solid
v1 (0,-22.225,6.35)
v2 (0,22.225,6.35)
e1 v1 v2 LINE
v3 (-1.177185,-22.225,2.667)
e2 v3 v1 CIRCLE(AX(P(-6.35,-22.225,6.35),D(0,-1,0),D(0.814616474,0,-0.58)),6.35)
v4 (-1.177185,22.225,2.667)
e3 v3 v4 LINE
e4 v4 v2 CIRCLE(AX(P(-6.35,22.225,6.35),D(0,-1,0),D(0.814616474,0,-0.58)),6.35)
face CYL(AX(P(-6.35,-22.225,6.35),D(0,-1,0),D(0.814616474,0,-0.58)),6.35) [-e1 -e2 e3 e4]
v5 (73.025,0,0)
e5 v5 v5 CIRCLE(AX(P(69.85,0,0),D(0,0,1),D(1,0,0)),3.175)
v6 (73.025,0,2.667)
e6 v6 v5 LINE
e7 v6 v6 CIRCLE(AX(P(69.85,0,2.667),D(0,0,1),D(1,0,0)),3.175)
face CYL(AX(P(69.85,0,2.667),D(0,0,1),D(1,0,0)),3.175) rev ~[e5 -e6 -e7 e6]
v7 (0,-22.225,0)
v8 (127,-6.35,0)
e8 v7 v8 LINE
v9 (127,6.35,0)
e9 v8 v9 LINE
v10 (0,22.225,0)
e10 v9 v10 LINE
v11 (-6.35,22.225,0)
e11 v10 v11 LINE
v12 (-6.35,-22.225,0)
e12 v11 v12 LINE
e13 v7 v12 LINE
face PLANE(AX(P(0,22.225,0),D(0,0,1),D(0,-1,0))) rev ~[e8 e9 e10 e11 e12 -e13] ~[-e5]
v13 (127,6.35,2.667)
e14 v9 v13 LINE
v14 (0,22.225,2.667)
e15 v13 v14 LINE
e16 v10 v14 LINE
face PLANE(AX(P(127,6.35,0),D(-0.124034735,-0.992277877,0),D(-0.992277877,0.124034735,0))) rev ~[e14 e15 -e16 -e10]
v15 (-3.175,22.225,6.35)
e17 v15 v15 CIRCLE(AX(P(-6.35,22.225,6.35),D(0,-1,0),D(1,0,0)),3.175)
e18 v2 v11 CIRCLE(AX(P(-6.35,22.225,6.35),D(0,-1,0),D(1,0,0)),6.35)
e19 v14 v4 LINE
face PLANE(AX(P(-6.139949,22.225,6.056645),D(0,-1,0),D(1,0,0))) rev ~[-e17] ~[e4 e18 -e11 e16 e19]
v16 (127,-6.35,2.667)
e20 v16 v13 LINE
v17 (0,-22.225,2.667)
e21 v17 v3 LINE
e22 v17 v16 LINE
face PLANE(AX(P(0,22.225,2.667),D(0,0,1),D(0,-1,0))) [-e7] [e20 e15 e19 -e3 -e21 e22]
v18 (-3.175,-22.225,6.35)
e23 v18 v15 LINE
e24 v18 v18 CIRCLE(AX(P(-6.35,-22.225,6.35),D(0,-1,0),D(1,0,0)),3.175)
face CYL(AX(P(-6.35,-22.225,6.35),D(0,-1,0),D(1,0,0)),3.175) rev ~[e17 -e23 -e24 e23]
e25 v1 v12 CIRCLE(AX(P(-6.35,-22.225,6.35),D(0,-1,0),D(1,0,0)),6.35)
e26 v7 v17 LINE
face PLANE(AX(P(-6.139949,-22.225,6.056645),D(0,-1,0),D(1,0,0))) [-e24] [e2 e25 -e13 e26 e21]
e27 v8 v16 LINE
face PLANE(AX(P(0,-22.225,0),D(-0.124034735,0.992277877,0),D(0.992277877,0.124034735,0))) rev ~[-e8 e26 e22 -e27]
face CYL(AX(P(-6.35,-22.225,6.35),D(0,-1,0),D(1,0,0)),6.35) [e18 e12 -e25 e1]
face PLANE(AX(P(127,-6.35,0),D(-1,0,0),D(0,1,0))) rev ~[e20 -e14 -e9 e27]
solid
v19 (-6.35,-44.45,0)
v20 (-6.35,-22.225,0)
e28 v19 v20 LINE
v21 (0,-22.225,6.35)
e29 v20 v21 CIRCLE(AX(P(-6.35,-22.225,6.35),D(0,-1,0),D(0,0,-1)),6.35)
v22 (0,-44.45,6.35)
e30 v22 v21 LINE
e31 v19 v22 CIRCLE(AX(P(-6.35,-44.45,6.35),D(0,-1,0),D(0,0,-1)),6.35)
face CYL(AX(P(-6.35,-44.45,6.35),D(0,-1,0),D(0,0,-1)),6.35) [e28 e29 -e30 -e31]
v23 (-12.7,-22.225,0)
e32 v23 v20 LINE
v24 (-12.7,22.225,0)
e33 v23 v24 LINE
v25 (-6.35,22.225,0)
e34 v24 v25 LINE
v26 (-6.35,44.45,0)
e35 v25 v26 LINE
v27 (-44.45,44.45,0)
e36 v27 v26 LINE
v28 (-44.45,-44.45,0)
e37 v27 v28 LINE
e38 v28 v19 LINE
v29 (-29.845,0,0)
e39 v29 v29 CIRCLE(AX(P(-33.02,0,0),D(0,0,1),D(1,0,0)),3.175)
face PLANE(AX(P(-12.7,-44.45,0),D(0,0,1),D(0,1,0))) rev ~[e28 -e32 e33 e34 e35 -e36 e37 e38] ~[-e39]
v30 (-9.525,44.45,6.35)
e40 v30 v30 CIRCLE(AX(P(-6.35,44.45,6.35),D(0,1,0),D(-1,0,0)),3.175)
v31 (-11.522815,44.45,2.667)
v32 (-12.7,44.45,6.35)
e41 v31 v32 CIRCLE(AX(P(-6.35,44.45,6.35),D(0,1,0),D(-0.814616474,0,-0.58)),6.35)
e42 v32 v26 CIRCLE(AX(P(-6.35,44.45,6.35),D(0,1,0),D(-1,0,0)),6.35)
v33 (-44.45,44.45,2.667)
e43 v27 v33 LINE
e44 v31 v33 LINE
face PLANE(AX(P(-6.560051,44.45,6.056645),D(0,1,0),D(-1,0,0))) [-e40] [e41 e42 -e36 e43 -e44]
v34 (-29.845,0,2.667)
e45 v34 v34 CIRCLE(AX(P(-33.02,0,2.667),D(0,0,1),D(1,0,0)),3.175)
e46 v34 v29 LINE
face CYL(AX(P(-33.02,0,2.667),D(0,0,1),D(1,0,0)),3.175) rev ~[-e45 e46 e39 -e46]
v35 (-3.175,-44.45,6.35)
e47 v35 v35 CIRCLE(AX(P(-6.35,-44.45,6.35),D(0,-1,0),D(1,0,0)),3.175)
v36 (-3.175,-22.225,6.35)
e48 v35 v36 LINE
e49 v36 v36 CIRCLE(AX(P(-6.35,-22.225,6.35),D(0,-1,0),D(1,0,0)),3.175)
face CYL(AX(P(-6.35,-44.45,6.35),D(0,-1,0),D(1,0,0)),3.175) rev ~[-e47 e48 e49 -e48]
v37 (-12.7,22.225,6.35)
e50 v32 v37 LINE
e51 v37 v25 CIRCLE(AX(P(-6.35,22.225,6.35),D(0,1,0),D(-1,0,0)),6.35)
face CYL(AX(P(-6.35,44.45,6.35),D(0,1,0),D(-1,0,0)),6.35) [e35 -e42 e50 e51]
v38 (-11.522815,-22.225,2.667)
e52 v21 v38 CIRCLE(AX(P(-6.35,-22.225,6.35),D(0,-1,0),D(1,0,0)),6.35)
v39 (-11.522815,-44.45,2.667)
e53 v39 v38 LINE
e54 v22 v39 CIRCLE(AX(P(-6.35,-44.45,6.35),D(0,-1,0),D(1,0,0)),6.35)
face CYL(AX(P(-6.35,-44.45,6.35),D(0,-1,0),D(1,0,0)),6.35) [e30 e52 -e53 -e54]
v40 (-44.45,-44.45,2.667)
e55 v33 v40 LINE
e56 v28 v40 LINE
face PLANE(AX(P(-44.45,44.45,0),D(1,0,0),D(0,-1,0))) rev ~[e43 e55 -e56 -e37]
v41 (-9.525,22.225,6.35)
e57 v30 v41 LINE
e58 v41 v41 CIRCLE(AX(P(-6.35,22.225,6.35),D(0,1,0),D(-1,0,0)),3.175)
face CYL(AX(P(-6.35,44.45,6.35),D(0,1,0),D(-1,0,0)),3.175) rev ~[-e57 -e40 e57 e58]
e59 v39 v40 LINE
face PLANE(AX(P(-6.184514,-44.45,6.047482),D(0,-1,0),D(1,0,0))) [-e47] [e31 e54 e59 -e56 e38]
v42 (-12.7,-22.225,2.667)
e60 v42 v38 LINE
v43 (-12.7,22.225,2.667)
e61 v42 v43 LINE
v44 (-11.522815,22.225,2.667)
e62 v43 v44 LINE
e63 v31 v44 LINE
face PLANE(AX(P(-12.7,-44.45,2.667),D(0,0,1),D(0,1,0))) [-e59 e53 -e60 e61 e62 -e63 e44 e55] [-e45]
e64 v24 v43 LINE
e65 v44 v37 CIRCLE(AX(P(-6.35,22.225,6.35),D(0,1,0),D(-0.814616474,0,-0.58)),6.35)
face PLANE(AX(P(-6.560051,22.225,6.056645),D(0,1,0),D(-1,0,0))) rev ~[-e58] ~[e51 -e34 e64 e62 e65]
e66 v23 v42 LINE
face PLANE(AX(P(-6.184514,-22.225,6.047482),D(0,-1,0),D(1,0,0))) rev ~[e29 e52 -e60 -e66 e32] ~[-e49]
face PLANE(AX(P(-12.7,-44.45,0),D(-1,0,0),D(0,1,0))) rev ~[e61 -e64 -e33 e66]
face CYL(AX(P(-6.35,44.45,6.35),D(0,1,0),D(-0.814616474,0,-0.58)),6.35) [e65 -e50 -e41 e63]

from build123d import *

# Parameters (mm, degrees)
F1_DEPTH  = 2.667
F2_DEPTH  = 6.35
F4_DEPTH  = 44.45
F5_R      = 3.175
F6_DEPTH  = 44.45
F8_DEPTH  = 2.667
F9_W      = 22.225
F9_H      = 2.667
F10_DEPTH = 6.35
F11_R     = 3.175
F12_DEPTH = 22.225
F13_R     = 3.175
F14_DEPTH = 22.225
F15_R     = 3.175
F16_DEPTH = 25.4
F17_R     = 3.175
F18_DEPTH = 25.4


with BuildPart() as f1:
    # F0 (on Top) → F1 (new body)
    with BuildSketch(Plane.XY):
        Polygon((127, 6.35), (0, 22.225), (0, -22.225), (127, -6.35), align=None)
    extrude(amount=F1_DEPTH)

    # F2 (add): a face of the model
    f2_faces = [f1.faces().sort_by_distance(p)[0] for p in [
        (0, 0, 1.3335),
    ]]
    extrude(f2_faces, amount=F2_DEPTH)

    # F3 (on face) → F4 (join, through all)
    with BuildSketch(Plane.XZ.offset(22.225)):
        with BuildLine():
            ThreePointArc((-1.177185389, 2.667), (-0.3014517122, 4.4167220557), (0, 6.35))
            ThreePointArc((0, 6.35), (-10.8401280605, 10.8401280605), (-6.35, 0))
            Line((-6.35, 0), (-6.35, 2.667))
            Line((-6.35, 2.667), (-1.177185389, 2.667))
        make_face()
    extrude(amount=-F4_DEPTH)

    # F5 (on face) → F6 (cut, through all)
    with BuildSketch(Plane.XZ.offset(22.225)):
        with Locations((-6.35, 6.35)):
            Circle(F5_R)
    extrude(amount=-F6_DEPTH, mode=Mode.SUBTRACT)

    # F17 (on face) → F18 (cut)
    with BuildSketch(Plane.XY.offset(2.667)):
        with Locations((69.85, 0)):
            Circle(F17_R)
    extrude(amount=-F18_DEPTH, mode=Mode.SUBTRACT)


with BuildPart() as f8:
    # F7 (on Top) → F8 (new body)
    with BuildSketch(Plane.XY):
        Polygon((-12.7, -44.45), (-12.7, -38.1), (-12.7, 38.1), (-12.7, 44.45), (-44.45, 44.45), (-44.45, -44.45), align=None)
    extrude(amount=F8_DEPTH)

    # F9 (on face) → F10 (join)
    with BuildSketch(Plane.YZ.offset(-12.7)):
        with Locations((-33.3375, 1.3335)):
            Rectangle(F9_W, F9_H)
        with Locations((33.3375, 1.3335)):
            Rectangle(F9_W, F9_H)
    extrude(amount=F10_DEPTH)

    # F11 (on face) → F12 (join, through all)
    with BuildSketch(Plane.XZ.offset(44.45)):
        with BuildLine():
            Line((-6.35, 2.667), (-6.35, 0))
            ThreePointArc((-6.35, 0), (-1.8598719395, 1.8598719395), (0, 6.35))
            ThreePointArc((0, 6.35), (-8.2832779443, 12.3985482878), (-11.522814611, 2.667))
            Line((-11.522814611, 2.667), (-6.35, 2.667))
        make_face()
        with Locations((-6.35, 6.35)):
            Circle(F11_R, mode=Mode.SUBTRACT)
    extrude(amount=-F12_DEPTH)

    # F13 (on face) → F14 (join, through all)
    with BuildSketch(Plane(origin=(0, 44.45, 0), x_dir=(-1, 0, 0), z_dir=(0, 1, 0))):
        with BuildLine():
            ThreePointArc((11.522814611, 2.667), (12.3985482878, 4.4167220557), (12.7, 6.35))
            ThreePointArc((12.7, 6.35), (1.8598719395, 10.8401280605), (6.35, 0))
            Line((6.35, 0), (6.35, 2.667))
            Line((6.35, 2.667), (11.522814611, 2.667))
        make_face()
        with Locations((6.35, 6.35)):
            Circle(F13_R, mode=Mode.SUBTRACT)
    extrude(amount=-F14_DEPTH)

    # F15 (on face) → F16 (cut)
    with BuildSketch(Plane.XY.offset(2.667)):
        with Locations((-33.02, 0)):
            Circle(F15_R)
    extrude(amount=-F16_DEPTH, mode=Mode.SUBTRACT)


solid = Compound([f1.part, f8.part])
